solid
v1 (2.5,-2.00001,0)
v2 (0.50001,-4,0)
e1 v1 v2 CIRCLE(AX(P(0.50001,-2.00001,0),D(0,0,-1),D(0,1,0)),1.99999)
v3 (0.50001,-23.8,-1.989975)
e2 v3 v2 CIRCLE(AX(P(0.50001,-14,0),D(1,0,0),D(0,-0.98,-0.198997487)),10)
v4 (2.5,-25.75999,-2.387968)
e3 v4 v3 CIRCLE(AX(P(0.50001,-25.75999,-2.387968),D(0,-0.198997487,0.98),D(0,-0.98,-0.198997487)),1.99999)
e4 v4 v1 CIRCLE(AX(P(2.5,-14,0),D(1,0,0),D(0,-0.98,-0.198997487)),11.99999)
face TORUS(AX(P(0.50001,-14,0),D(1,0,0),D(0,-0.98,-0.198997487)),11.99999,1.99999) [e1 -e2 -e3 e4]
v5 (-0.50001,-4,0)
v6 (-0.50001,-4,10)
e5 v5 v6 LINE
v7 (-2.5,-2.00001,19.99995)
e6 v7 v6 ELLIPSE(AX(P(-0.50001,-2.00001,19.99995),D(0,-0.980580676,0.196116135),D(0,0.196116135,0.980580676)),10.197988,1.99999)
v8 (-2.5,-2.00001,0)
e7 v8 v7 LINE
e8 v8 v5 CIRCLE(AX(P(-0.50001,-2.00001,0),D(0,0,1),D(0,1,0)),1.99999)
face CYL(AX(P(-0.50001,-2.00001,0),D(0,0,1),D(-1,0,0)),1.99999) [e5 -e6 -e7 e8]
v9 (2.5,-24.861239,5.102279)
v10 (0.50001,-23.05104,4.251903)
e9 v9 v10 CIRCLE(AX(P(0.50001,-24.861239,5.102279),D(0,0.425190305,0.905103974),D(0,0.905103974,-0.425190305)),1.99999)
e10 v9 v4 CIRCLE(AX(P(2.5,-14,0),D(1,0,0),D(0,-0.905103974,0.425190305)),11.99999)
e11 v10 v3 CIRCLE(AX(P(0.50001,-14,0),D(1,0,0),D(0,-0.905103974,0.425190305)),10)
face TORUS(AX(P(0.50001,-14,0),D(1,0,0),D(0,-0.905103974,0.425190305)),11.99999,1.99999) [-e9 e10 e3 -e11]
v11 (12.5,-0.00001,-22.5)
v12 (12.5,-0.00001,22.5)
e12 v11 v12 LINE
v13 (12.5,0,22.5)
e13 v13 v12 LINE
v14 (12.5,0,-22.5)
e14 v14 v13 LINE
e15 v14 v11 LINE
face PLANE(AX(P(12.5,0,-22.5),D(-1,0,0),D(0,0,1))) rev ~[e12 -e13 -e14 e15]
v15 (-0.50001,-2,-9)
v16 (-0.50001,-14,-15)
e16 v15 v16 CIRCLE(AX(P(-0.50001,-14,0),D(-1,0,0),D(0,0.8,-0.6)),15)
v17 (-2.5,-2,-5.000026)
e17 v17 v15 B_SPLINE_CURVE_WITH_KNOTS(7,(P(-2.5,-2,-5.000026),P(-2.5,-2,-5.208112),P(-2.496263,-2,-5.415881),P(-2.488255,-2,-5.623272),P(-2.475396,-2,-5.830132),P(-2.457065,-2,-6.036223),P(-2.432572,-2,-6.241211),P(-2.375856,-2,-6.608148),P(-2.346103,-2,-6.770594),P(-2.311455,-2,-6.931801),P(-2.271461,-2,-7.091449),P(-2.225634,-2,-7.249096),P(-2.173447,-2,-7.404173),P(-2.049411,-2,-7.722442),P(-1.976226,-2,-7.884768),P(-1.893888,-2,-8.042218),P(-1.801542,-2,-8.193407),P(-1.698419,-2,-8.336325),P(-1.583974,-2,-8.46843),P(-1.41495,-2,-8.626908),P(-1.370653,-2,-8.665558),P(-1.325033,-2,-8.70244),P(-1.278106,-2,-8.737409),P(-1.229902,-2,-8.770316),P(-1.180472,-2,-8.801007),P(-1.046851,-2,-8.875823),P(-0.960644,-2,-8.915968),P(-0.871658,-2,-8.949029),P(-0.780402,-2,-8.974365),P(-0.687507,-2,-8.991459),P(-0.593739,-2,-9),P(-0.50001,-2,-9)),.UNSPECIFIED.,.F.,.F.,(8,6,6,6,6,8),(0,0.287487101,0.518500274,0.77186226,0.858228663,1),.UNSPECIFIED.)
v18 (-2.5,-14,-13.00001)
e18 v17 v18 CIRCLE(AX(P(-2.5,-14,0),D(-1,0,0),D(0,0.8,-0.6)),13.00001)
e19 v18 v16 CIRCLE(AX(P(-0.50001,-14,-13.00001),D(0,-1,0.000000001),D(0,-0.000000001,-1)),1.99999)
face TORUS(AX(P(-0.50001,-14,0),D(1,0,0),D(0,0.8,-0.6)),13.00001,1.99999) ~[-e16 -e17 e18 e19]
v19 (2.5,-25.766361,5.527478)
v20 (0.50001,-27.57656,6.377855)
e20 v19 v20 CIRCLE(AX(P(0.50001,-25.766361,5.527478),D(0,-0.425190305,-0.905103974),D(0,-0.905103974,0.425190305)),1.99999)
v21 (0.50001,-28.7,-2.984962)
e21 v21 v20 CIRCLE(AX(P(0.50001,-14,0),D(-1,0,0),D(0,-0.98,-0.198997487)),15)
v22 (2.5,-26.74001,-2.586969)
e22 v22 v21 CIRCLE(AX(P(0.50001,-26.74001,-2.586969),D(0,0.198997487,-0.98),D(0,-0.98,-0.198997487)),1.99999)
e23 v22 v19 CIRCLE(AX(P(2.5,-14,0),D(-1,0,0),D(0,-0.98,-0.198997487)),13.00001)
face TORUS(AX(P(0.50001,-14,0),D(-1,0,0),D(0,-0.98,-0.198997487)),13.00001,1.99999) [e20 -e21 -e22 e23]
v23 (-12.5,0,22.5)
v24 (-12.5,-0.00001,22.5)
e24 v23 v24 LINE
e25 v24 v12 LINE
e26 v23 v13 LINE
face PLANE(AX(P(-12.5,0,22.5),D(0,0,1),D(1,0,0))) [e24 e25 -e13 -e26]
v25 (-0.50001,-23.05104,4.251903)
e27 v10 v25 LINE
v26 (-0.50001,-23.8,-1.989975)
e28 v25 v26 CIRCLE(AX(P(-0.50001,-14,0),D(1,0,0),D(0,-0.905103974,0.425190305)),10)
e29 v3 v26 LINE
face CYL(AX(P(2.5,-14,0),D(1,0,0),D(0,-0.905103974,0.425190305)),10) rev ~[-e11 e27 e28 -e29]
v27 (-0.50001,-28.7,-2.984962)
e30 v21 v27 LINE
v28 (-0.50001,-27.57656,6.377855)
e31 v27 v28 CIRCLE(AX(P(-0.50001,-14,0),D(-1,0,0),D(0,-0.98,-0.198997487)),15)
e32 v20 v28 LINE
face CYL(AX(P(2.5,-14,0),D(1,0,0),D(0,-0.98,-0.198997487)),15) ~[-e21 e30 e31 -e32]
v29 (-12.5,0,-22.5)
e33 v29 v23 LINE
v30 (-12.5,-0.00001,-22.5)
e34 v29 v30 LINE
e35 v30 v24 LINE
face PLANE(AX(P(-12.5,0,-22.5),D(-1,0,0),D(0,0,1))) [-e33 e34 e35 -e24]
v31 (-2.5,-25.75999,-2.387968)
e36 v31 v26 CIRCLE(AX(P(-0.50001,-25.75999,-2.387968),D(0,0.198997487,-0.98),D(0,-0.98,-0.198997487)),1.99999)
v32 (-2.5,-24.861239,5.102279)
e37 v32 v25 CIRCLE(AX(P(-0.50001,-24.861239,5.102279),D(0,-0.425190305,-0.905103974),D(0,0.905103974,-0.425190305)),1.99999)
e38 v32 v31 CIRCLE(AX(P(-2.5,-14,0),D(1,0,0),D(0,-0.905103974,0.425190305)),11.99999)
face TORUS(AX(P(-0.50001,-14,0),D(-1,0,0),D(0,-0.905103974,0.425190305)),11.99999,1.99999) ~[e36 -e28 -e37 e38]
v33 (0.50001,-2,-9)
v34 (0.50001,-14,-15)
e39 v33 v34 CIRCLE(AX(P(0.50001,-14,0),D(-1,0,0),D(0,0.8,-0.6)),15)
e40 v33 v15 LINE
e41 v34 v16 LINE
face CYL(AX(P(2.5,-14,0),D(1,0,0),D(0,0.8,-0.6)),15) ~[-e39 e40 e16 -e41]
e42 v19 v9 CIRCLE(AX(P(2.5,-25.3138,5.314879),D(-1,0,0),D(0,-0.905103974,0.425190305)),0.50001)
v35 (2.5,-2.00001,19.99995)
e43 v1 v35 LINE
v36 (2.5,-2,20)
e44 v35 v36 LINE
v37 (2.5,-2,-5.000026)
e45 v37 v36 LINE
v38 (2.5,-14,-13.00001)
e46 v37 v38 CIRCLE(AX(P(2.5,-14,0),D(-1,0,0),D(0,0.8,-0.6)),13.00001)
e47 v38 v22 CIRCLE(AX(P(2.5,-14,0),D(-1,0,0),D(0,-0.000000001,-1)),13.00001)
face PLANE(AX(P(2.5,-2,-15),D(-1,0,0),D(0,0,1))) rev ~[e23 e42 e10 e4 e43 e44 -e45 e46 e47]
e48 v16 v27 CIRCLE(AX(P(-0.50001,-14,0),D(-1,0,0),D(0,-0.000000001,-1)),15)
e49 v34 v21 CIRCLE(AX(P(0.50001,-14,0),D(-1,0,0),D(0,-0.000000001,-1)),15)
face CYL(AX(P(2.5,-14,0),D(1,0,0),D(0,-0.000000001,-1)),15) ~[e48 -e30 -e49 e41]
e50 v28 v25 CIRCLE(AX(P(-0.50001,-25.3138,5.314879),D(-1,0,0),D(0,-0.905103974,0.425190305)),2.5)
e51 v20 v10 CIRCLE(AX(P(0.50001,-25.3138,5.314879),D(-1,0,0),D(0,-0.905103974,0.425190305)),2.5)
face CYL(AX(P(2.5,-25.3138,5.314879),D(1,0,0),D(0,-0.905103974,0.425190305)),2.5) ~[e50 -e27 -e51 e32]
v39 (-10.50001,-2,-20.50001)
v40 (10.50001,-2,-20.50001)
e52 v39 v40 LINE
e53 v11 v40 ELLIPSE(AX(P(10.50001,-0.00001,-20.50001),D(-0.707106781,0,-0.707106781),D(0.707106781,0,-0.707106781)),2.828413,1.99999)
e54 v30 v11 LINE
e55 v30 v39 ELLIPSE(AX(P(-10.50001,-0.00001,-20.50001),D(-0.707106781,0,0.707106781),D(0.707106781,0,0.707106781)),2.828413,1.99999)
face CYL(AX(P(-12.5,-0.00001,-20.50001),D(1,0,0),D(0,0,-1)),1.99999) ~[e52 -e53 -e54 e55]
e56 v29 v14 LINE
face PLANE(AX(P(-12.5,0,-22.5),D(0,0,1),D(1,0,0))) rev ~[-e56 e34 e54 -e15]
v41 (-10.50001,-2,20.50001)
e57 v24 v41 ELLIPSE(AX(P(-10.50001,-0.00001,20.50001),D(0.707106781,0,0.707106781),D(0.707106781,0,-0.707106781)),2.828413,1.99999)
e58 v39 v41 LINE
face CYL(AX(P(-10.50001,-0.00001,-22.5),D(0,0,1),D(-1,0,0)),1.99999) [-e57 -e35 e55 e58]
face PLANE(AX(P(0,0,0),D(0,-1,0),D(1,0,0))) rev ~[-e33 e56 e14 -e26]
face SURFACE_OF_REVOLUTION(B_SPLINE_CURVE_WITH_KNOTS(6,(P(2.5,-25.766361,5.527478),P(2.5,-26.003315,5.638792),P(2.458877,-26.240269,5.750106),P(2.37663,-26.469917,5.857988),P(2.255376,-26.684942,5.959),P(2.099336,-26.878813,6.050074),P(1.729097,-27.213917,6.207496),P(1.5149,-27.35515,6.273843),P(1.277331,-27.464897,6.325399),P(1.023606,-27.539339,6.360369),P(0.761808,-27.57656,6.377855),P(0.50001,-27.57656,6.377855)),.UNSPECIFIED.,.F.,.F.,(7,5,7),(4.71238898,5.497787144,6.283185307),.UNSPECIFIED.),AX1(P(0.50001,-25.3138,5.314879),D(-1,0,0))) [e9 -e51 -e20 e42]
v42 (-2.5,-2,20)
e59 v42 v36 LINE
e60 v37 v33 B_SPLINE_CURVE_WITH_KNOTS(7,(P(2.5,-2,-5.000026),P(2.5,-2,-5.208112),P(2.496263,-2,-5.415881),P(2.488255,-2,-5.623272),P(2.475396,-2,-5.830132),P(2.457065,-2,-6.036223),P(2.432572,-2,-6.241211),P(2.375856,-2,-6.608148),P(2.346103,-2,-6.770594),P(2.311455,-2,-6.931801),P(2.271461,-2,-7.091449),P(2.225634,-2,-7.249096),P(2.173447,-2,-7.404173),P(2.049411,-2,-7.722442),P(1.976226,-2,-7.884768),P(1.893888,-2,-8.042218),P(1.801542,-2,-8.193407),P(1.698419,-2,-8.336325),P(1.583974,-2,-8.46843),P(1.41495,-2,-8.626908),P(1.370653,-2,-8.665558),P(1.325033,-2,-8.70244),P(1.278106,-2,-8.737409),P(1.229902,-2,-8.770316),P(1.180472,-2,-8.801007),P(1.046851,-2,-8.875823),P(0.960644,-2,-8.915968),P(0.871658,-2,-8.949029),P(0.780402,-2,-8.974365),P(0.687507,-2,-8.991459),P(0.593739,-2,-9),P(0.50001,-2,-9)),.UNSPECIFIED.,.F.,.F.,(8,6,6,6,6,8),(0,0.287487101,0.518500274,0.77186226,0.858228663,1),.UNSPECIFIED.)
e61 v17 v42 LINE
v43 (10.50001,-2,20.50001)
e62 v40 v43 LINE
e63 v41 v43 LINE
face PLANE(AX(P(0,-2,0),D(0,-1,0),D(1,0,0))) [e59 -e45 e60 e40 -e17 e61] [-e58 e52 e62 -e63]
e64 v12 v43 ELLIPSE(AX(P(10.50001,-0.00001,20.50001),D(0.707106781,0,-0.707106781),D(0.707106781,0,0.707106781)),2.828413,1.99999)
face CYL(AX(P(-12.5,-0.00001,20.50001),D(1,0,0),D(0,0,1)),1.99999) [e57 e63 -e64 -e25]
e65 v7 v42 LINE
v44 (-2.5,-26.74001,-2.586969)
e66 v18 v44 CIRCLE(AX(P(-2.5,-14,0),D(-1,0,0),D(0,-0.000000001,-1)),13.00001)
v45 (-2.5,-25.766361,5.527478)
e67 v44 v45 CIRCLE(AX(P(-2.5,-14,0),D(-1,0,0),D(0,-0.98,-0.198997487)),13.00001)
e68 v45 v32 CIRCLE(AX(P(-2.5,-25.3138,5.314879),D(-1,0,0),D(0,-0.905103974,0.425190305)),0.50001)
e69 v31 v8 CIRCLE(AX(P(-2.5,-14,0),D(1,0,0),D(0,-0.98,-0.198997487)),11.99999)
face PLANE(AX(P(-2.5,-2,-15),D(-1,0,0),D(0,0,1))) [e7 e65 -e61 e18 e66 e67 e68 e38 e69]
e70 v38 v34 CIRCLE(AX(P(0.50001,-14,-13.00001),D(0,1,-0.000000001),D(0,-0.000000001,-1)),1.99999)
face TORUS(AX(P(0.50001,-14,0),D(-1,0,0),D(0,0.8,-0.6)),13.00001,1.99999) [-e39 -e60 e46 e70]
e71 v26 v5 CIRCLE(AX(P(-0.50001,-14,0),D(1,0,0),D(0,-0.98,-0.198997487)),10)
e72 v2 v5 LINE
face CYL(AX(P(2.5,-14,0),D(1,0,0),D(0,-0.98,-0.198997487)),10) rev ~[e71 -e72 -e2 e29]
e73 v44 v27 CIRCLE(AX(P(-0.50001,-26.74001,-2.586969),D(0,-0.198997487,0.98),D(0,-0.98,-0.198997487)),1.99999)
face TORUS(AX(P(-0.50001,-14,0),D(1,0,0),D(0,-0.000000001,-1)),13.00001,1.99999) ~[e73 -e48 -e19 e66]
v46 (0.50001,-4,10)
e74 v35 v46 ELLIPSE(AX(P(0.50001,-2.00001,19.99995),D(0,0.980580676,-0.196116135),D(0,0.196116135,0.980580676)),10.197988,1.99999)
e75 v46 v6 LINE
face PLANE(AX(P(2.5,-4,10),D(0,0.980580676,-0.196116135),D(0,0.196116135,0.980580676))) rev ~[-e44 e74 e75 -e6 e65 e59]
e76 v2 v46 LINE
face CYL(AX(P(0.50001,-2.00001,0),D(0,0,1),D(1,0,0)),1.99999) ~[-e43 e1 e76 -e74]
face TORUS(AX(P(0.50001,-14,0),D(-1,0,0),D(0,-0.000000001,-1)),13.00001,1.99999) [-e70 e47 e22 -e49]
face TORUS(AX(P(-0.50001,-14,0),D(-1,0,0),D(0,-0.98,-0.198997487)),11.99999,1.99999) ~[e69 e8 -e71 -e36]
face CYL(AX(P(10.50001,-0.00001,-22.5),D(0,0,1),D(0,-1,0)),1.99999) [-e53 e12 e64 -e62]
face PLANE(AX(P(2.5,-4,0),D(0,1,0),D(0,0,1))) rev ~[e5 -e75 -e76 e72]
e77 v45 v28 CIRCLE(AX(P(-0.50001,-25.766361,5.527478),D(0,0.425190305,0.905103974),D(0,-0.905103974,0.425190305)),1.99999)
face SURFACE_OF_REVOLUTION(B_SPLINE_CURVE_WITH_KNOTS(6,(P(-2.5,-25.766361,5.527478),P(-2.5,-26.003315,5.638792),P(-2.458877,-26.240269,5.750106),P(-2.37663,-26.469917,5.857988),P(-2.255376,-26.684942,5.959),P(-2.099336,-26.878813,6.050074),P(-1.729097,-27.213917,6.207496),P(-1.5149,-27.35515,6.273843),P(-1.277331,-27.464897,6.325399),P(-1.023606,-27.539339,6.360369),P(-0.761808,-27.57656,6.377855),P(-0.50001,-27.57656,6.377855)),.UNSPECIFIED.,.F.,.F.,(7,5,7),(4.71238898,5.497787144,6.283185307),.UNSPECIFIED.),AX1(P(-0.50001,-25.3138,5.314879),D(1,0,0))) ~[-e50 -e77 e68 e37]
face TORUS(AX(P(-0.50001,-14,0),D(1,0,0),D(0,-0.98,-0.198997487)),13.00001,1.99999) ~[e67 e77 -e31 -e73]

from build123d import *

# Parameters (mm, degrees)
F0_W     = 25
F0_H     = 45
F1_DEPTH = 2
F2_W     = 5
F2_H     = 35
F3_DEPTH = 50
F5_DEPTH = 5
F6_R     = 1.99999


# Not quite as in the source:
# - a fillet or chamfer is up to 0.001 mm smaller than in the source, because OpenCascade refuses the exact size


with BuildPart() as f1:
    # F0 (on Front) → F1 (new body)
    with BuildSketch(Plane.XZ):
        Rectangle(F0_W, F0_H)
    extrude(amount=F1_DEPTH)

    # F2 (on face) → F3 (join)
    with BuildSketch(Plane.XZ.offset(2)):
        with Locations((0, 2.5)):
            Rectangle(F2_W, F2_H)
    extrude(amount=F3_DEPTH)

    # F4 (on face) → F5 (cut, through all)
    with BuildSketch(Plane.YZ.offset(2.5)):
        with BuildLine():
            Line((-4, 10), (-2, 20))
            Line((-2, 20), (-52, 20))
            Line((-52, 20), (-52, -15))
            Line((-52, -15), (-14.0000000101, -15))
            ThreePointArc((-14.0000000101, -15), (-23.4927752917, -11.6140956282), (-28.7, -2.9849623113))
            ThreePointArc((-28.7, -2.9849623113), (-28.8931709496, 1.7870252), (-27.5765596133, 6.3778545818))
            ThreePointArc((-27.5765596133, 6.3778545818), (-24.2508239141, 7.5776387537), (-23.0510397422, 4.2519030545))
            ThreePointArc((-23.0510397422, 4.2519030545), (-23.9287806331, 1.1913501333), (-23.8, -1.9899748742))
            ThreePointArc((-23.8, -1.9899748742), (-13, -9.9498743711), (-4, 0))
            Line((-4, 0), (-4, 10))
        make_face()
        with BuildLine():
            Line((-2, -15), (-2, -9))
            ThreePointArc((-2, -9), (-7.291796072, -13.4164078673), (-14.0000000101, -15))
            Line((-14.0000000101, -15), (-2, -15))
        make_face()
    extrude(amount=-F5_DEPTH, mode=Mode.SUBTRACT)

    # F6 (radius 2 in the source; OpenCascade refuses exactly that, so slightly less here)
    f6_edges = [f1.edges().sort_by_distance(p)[0] for p in [
        (2.5, -24.250824, 7.577639),
        (-2.5, -24.250824, 7.577639),
        (0, -2, 22.5),
        (-12.5, -2, 0),
        (0, -2, -22.5),
        (12.5, -2, 0),
    ]]
    fillet(f6_edges, radius=F6_R)


solid = f1.part
